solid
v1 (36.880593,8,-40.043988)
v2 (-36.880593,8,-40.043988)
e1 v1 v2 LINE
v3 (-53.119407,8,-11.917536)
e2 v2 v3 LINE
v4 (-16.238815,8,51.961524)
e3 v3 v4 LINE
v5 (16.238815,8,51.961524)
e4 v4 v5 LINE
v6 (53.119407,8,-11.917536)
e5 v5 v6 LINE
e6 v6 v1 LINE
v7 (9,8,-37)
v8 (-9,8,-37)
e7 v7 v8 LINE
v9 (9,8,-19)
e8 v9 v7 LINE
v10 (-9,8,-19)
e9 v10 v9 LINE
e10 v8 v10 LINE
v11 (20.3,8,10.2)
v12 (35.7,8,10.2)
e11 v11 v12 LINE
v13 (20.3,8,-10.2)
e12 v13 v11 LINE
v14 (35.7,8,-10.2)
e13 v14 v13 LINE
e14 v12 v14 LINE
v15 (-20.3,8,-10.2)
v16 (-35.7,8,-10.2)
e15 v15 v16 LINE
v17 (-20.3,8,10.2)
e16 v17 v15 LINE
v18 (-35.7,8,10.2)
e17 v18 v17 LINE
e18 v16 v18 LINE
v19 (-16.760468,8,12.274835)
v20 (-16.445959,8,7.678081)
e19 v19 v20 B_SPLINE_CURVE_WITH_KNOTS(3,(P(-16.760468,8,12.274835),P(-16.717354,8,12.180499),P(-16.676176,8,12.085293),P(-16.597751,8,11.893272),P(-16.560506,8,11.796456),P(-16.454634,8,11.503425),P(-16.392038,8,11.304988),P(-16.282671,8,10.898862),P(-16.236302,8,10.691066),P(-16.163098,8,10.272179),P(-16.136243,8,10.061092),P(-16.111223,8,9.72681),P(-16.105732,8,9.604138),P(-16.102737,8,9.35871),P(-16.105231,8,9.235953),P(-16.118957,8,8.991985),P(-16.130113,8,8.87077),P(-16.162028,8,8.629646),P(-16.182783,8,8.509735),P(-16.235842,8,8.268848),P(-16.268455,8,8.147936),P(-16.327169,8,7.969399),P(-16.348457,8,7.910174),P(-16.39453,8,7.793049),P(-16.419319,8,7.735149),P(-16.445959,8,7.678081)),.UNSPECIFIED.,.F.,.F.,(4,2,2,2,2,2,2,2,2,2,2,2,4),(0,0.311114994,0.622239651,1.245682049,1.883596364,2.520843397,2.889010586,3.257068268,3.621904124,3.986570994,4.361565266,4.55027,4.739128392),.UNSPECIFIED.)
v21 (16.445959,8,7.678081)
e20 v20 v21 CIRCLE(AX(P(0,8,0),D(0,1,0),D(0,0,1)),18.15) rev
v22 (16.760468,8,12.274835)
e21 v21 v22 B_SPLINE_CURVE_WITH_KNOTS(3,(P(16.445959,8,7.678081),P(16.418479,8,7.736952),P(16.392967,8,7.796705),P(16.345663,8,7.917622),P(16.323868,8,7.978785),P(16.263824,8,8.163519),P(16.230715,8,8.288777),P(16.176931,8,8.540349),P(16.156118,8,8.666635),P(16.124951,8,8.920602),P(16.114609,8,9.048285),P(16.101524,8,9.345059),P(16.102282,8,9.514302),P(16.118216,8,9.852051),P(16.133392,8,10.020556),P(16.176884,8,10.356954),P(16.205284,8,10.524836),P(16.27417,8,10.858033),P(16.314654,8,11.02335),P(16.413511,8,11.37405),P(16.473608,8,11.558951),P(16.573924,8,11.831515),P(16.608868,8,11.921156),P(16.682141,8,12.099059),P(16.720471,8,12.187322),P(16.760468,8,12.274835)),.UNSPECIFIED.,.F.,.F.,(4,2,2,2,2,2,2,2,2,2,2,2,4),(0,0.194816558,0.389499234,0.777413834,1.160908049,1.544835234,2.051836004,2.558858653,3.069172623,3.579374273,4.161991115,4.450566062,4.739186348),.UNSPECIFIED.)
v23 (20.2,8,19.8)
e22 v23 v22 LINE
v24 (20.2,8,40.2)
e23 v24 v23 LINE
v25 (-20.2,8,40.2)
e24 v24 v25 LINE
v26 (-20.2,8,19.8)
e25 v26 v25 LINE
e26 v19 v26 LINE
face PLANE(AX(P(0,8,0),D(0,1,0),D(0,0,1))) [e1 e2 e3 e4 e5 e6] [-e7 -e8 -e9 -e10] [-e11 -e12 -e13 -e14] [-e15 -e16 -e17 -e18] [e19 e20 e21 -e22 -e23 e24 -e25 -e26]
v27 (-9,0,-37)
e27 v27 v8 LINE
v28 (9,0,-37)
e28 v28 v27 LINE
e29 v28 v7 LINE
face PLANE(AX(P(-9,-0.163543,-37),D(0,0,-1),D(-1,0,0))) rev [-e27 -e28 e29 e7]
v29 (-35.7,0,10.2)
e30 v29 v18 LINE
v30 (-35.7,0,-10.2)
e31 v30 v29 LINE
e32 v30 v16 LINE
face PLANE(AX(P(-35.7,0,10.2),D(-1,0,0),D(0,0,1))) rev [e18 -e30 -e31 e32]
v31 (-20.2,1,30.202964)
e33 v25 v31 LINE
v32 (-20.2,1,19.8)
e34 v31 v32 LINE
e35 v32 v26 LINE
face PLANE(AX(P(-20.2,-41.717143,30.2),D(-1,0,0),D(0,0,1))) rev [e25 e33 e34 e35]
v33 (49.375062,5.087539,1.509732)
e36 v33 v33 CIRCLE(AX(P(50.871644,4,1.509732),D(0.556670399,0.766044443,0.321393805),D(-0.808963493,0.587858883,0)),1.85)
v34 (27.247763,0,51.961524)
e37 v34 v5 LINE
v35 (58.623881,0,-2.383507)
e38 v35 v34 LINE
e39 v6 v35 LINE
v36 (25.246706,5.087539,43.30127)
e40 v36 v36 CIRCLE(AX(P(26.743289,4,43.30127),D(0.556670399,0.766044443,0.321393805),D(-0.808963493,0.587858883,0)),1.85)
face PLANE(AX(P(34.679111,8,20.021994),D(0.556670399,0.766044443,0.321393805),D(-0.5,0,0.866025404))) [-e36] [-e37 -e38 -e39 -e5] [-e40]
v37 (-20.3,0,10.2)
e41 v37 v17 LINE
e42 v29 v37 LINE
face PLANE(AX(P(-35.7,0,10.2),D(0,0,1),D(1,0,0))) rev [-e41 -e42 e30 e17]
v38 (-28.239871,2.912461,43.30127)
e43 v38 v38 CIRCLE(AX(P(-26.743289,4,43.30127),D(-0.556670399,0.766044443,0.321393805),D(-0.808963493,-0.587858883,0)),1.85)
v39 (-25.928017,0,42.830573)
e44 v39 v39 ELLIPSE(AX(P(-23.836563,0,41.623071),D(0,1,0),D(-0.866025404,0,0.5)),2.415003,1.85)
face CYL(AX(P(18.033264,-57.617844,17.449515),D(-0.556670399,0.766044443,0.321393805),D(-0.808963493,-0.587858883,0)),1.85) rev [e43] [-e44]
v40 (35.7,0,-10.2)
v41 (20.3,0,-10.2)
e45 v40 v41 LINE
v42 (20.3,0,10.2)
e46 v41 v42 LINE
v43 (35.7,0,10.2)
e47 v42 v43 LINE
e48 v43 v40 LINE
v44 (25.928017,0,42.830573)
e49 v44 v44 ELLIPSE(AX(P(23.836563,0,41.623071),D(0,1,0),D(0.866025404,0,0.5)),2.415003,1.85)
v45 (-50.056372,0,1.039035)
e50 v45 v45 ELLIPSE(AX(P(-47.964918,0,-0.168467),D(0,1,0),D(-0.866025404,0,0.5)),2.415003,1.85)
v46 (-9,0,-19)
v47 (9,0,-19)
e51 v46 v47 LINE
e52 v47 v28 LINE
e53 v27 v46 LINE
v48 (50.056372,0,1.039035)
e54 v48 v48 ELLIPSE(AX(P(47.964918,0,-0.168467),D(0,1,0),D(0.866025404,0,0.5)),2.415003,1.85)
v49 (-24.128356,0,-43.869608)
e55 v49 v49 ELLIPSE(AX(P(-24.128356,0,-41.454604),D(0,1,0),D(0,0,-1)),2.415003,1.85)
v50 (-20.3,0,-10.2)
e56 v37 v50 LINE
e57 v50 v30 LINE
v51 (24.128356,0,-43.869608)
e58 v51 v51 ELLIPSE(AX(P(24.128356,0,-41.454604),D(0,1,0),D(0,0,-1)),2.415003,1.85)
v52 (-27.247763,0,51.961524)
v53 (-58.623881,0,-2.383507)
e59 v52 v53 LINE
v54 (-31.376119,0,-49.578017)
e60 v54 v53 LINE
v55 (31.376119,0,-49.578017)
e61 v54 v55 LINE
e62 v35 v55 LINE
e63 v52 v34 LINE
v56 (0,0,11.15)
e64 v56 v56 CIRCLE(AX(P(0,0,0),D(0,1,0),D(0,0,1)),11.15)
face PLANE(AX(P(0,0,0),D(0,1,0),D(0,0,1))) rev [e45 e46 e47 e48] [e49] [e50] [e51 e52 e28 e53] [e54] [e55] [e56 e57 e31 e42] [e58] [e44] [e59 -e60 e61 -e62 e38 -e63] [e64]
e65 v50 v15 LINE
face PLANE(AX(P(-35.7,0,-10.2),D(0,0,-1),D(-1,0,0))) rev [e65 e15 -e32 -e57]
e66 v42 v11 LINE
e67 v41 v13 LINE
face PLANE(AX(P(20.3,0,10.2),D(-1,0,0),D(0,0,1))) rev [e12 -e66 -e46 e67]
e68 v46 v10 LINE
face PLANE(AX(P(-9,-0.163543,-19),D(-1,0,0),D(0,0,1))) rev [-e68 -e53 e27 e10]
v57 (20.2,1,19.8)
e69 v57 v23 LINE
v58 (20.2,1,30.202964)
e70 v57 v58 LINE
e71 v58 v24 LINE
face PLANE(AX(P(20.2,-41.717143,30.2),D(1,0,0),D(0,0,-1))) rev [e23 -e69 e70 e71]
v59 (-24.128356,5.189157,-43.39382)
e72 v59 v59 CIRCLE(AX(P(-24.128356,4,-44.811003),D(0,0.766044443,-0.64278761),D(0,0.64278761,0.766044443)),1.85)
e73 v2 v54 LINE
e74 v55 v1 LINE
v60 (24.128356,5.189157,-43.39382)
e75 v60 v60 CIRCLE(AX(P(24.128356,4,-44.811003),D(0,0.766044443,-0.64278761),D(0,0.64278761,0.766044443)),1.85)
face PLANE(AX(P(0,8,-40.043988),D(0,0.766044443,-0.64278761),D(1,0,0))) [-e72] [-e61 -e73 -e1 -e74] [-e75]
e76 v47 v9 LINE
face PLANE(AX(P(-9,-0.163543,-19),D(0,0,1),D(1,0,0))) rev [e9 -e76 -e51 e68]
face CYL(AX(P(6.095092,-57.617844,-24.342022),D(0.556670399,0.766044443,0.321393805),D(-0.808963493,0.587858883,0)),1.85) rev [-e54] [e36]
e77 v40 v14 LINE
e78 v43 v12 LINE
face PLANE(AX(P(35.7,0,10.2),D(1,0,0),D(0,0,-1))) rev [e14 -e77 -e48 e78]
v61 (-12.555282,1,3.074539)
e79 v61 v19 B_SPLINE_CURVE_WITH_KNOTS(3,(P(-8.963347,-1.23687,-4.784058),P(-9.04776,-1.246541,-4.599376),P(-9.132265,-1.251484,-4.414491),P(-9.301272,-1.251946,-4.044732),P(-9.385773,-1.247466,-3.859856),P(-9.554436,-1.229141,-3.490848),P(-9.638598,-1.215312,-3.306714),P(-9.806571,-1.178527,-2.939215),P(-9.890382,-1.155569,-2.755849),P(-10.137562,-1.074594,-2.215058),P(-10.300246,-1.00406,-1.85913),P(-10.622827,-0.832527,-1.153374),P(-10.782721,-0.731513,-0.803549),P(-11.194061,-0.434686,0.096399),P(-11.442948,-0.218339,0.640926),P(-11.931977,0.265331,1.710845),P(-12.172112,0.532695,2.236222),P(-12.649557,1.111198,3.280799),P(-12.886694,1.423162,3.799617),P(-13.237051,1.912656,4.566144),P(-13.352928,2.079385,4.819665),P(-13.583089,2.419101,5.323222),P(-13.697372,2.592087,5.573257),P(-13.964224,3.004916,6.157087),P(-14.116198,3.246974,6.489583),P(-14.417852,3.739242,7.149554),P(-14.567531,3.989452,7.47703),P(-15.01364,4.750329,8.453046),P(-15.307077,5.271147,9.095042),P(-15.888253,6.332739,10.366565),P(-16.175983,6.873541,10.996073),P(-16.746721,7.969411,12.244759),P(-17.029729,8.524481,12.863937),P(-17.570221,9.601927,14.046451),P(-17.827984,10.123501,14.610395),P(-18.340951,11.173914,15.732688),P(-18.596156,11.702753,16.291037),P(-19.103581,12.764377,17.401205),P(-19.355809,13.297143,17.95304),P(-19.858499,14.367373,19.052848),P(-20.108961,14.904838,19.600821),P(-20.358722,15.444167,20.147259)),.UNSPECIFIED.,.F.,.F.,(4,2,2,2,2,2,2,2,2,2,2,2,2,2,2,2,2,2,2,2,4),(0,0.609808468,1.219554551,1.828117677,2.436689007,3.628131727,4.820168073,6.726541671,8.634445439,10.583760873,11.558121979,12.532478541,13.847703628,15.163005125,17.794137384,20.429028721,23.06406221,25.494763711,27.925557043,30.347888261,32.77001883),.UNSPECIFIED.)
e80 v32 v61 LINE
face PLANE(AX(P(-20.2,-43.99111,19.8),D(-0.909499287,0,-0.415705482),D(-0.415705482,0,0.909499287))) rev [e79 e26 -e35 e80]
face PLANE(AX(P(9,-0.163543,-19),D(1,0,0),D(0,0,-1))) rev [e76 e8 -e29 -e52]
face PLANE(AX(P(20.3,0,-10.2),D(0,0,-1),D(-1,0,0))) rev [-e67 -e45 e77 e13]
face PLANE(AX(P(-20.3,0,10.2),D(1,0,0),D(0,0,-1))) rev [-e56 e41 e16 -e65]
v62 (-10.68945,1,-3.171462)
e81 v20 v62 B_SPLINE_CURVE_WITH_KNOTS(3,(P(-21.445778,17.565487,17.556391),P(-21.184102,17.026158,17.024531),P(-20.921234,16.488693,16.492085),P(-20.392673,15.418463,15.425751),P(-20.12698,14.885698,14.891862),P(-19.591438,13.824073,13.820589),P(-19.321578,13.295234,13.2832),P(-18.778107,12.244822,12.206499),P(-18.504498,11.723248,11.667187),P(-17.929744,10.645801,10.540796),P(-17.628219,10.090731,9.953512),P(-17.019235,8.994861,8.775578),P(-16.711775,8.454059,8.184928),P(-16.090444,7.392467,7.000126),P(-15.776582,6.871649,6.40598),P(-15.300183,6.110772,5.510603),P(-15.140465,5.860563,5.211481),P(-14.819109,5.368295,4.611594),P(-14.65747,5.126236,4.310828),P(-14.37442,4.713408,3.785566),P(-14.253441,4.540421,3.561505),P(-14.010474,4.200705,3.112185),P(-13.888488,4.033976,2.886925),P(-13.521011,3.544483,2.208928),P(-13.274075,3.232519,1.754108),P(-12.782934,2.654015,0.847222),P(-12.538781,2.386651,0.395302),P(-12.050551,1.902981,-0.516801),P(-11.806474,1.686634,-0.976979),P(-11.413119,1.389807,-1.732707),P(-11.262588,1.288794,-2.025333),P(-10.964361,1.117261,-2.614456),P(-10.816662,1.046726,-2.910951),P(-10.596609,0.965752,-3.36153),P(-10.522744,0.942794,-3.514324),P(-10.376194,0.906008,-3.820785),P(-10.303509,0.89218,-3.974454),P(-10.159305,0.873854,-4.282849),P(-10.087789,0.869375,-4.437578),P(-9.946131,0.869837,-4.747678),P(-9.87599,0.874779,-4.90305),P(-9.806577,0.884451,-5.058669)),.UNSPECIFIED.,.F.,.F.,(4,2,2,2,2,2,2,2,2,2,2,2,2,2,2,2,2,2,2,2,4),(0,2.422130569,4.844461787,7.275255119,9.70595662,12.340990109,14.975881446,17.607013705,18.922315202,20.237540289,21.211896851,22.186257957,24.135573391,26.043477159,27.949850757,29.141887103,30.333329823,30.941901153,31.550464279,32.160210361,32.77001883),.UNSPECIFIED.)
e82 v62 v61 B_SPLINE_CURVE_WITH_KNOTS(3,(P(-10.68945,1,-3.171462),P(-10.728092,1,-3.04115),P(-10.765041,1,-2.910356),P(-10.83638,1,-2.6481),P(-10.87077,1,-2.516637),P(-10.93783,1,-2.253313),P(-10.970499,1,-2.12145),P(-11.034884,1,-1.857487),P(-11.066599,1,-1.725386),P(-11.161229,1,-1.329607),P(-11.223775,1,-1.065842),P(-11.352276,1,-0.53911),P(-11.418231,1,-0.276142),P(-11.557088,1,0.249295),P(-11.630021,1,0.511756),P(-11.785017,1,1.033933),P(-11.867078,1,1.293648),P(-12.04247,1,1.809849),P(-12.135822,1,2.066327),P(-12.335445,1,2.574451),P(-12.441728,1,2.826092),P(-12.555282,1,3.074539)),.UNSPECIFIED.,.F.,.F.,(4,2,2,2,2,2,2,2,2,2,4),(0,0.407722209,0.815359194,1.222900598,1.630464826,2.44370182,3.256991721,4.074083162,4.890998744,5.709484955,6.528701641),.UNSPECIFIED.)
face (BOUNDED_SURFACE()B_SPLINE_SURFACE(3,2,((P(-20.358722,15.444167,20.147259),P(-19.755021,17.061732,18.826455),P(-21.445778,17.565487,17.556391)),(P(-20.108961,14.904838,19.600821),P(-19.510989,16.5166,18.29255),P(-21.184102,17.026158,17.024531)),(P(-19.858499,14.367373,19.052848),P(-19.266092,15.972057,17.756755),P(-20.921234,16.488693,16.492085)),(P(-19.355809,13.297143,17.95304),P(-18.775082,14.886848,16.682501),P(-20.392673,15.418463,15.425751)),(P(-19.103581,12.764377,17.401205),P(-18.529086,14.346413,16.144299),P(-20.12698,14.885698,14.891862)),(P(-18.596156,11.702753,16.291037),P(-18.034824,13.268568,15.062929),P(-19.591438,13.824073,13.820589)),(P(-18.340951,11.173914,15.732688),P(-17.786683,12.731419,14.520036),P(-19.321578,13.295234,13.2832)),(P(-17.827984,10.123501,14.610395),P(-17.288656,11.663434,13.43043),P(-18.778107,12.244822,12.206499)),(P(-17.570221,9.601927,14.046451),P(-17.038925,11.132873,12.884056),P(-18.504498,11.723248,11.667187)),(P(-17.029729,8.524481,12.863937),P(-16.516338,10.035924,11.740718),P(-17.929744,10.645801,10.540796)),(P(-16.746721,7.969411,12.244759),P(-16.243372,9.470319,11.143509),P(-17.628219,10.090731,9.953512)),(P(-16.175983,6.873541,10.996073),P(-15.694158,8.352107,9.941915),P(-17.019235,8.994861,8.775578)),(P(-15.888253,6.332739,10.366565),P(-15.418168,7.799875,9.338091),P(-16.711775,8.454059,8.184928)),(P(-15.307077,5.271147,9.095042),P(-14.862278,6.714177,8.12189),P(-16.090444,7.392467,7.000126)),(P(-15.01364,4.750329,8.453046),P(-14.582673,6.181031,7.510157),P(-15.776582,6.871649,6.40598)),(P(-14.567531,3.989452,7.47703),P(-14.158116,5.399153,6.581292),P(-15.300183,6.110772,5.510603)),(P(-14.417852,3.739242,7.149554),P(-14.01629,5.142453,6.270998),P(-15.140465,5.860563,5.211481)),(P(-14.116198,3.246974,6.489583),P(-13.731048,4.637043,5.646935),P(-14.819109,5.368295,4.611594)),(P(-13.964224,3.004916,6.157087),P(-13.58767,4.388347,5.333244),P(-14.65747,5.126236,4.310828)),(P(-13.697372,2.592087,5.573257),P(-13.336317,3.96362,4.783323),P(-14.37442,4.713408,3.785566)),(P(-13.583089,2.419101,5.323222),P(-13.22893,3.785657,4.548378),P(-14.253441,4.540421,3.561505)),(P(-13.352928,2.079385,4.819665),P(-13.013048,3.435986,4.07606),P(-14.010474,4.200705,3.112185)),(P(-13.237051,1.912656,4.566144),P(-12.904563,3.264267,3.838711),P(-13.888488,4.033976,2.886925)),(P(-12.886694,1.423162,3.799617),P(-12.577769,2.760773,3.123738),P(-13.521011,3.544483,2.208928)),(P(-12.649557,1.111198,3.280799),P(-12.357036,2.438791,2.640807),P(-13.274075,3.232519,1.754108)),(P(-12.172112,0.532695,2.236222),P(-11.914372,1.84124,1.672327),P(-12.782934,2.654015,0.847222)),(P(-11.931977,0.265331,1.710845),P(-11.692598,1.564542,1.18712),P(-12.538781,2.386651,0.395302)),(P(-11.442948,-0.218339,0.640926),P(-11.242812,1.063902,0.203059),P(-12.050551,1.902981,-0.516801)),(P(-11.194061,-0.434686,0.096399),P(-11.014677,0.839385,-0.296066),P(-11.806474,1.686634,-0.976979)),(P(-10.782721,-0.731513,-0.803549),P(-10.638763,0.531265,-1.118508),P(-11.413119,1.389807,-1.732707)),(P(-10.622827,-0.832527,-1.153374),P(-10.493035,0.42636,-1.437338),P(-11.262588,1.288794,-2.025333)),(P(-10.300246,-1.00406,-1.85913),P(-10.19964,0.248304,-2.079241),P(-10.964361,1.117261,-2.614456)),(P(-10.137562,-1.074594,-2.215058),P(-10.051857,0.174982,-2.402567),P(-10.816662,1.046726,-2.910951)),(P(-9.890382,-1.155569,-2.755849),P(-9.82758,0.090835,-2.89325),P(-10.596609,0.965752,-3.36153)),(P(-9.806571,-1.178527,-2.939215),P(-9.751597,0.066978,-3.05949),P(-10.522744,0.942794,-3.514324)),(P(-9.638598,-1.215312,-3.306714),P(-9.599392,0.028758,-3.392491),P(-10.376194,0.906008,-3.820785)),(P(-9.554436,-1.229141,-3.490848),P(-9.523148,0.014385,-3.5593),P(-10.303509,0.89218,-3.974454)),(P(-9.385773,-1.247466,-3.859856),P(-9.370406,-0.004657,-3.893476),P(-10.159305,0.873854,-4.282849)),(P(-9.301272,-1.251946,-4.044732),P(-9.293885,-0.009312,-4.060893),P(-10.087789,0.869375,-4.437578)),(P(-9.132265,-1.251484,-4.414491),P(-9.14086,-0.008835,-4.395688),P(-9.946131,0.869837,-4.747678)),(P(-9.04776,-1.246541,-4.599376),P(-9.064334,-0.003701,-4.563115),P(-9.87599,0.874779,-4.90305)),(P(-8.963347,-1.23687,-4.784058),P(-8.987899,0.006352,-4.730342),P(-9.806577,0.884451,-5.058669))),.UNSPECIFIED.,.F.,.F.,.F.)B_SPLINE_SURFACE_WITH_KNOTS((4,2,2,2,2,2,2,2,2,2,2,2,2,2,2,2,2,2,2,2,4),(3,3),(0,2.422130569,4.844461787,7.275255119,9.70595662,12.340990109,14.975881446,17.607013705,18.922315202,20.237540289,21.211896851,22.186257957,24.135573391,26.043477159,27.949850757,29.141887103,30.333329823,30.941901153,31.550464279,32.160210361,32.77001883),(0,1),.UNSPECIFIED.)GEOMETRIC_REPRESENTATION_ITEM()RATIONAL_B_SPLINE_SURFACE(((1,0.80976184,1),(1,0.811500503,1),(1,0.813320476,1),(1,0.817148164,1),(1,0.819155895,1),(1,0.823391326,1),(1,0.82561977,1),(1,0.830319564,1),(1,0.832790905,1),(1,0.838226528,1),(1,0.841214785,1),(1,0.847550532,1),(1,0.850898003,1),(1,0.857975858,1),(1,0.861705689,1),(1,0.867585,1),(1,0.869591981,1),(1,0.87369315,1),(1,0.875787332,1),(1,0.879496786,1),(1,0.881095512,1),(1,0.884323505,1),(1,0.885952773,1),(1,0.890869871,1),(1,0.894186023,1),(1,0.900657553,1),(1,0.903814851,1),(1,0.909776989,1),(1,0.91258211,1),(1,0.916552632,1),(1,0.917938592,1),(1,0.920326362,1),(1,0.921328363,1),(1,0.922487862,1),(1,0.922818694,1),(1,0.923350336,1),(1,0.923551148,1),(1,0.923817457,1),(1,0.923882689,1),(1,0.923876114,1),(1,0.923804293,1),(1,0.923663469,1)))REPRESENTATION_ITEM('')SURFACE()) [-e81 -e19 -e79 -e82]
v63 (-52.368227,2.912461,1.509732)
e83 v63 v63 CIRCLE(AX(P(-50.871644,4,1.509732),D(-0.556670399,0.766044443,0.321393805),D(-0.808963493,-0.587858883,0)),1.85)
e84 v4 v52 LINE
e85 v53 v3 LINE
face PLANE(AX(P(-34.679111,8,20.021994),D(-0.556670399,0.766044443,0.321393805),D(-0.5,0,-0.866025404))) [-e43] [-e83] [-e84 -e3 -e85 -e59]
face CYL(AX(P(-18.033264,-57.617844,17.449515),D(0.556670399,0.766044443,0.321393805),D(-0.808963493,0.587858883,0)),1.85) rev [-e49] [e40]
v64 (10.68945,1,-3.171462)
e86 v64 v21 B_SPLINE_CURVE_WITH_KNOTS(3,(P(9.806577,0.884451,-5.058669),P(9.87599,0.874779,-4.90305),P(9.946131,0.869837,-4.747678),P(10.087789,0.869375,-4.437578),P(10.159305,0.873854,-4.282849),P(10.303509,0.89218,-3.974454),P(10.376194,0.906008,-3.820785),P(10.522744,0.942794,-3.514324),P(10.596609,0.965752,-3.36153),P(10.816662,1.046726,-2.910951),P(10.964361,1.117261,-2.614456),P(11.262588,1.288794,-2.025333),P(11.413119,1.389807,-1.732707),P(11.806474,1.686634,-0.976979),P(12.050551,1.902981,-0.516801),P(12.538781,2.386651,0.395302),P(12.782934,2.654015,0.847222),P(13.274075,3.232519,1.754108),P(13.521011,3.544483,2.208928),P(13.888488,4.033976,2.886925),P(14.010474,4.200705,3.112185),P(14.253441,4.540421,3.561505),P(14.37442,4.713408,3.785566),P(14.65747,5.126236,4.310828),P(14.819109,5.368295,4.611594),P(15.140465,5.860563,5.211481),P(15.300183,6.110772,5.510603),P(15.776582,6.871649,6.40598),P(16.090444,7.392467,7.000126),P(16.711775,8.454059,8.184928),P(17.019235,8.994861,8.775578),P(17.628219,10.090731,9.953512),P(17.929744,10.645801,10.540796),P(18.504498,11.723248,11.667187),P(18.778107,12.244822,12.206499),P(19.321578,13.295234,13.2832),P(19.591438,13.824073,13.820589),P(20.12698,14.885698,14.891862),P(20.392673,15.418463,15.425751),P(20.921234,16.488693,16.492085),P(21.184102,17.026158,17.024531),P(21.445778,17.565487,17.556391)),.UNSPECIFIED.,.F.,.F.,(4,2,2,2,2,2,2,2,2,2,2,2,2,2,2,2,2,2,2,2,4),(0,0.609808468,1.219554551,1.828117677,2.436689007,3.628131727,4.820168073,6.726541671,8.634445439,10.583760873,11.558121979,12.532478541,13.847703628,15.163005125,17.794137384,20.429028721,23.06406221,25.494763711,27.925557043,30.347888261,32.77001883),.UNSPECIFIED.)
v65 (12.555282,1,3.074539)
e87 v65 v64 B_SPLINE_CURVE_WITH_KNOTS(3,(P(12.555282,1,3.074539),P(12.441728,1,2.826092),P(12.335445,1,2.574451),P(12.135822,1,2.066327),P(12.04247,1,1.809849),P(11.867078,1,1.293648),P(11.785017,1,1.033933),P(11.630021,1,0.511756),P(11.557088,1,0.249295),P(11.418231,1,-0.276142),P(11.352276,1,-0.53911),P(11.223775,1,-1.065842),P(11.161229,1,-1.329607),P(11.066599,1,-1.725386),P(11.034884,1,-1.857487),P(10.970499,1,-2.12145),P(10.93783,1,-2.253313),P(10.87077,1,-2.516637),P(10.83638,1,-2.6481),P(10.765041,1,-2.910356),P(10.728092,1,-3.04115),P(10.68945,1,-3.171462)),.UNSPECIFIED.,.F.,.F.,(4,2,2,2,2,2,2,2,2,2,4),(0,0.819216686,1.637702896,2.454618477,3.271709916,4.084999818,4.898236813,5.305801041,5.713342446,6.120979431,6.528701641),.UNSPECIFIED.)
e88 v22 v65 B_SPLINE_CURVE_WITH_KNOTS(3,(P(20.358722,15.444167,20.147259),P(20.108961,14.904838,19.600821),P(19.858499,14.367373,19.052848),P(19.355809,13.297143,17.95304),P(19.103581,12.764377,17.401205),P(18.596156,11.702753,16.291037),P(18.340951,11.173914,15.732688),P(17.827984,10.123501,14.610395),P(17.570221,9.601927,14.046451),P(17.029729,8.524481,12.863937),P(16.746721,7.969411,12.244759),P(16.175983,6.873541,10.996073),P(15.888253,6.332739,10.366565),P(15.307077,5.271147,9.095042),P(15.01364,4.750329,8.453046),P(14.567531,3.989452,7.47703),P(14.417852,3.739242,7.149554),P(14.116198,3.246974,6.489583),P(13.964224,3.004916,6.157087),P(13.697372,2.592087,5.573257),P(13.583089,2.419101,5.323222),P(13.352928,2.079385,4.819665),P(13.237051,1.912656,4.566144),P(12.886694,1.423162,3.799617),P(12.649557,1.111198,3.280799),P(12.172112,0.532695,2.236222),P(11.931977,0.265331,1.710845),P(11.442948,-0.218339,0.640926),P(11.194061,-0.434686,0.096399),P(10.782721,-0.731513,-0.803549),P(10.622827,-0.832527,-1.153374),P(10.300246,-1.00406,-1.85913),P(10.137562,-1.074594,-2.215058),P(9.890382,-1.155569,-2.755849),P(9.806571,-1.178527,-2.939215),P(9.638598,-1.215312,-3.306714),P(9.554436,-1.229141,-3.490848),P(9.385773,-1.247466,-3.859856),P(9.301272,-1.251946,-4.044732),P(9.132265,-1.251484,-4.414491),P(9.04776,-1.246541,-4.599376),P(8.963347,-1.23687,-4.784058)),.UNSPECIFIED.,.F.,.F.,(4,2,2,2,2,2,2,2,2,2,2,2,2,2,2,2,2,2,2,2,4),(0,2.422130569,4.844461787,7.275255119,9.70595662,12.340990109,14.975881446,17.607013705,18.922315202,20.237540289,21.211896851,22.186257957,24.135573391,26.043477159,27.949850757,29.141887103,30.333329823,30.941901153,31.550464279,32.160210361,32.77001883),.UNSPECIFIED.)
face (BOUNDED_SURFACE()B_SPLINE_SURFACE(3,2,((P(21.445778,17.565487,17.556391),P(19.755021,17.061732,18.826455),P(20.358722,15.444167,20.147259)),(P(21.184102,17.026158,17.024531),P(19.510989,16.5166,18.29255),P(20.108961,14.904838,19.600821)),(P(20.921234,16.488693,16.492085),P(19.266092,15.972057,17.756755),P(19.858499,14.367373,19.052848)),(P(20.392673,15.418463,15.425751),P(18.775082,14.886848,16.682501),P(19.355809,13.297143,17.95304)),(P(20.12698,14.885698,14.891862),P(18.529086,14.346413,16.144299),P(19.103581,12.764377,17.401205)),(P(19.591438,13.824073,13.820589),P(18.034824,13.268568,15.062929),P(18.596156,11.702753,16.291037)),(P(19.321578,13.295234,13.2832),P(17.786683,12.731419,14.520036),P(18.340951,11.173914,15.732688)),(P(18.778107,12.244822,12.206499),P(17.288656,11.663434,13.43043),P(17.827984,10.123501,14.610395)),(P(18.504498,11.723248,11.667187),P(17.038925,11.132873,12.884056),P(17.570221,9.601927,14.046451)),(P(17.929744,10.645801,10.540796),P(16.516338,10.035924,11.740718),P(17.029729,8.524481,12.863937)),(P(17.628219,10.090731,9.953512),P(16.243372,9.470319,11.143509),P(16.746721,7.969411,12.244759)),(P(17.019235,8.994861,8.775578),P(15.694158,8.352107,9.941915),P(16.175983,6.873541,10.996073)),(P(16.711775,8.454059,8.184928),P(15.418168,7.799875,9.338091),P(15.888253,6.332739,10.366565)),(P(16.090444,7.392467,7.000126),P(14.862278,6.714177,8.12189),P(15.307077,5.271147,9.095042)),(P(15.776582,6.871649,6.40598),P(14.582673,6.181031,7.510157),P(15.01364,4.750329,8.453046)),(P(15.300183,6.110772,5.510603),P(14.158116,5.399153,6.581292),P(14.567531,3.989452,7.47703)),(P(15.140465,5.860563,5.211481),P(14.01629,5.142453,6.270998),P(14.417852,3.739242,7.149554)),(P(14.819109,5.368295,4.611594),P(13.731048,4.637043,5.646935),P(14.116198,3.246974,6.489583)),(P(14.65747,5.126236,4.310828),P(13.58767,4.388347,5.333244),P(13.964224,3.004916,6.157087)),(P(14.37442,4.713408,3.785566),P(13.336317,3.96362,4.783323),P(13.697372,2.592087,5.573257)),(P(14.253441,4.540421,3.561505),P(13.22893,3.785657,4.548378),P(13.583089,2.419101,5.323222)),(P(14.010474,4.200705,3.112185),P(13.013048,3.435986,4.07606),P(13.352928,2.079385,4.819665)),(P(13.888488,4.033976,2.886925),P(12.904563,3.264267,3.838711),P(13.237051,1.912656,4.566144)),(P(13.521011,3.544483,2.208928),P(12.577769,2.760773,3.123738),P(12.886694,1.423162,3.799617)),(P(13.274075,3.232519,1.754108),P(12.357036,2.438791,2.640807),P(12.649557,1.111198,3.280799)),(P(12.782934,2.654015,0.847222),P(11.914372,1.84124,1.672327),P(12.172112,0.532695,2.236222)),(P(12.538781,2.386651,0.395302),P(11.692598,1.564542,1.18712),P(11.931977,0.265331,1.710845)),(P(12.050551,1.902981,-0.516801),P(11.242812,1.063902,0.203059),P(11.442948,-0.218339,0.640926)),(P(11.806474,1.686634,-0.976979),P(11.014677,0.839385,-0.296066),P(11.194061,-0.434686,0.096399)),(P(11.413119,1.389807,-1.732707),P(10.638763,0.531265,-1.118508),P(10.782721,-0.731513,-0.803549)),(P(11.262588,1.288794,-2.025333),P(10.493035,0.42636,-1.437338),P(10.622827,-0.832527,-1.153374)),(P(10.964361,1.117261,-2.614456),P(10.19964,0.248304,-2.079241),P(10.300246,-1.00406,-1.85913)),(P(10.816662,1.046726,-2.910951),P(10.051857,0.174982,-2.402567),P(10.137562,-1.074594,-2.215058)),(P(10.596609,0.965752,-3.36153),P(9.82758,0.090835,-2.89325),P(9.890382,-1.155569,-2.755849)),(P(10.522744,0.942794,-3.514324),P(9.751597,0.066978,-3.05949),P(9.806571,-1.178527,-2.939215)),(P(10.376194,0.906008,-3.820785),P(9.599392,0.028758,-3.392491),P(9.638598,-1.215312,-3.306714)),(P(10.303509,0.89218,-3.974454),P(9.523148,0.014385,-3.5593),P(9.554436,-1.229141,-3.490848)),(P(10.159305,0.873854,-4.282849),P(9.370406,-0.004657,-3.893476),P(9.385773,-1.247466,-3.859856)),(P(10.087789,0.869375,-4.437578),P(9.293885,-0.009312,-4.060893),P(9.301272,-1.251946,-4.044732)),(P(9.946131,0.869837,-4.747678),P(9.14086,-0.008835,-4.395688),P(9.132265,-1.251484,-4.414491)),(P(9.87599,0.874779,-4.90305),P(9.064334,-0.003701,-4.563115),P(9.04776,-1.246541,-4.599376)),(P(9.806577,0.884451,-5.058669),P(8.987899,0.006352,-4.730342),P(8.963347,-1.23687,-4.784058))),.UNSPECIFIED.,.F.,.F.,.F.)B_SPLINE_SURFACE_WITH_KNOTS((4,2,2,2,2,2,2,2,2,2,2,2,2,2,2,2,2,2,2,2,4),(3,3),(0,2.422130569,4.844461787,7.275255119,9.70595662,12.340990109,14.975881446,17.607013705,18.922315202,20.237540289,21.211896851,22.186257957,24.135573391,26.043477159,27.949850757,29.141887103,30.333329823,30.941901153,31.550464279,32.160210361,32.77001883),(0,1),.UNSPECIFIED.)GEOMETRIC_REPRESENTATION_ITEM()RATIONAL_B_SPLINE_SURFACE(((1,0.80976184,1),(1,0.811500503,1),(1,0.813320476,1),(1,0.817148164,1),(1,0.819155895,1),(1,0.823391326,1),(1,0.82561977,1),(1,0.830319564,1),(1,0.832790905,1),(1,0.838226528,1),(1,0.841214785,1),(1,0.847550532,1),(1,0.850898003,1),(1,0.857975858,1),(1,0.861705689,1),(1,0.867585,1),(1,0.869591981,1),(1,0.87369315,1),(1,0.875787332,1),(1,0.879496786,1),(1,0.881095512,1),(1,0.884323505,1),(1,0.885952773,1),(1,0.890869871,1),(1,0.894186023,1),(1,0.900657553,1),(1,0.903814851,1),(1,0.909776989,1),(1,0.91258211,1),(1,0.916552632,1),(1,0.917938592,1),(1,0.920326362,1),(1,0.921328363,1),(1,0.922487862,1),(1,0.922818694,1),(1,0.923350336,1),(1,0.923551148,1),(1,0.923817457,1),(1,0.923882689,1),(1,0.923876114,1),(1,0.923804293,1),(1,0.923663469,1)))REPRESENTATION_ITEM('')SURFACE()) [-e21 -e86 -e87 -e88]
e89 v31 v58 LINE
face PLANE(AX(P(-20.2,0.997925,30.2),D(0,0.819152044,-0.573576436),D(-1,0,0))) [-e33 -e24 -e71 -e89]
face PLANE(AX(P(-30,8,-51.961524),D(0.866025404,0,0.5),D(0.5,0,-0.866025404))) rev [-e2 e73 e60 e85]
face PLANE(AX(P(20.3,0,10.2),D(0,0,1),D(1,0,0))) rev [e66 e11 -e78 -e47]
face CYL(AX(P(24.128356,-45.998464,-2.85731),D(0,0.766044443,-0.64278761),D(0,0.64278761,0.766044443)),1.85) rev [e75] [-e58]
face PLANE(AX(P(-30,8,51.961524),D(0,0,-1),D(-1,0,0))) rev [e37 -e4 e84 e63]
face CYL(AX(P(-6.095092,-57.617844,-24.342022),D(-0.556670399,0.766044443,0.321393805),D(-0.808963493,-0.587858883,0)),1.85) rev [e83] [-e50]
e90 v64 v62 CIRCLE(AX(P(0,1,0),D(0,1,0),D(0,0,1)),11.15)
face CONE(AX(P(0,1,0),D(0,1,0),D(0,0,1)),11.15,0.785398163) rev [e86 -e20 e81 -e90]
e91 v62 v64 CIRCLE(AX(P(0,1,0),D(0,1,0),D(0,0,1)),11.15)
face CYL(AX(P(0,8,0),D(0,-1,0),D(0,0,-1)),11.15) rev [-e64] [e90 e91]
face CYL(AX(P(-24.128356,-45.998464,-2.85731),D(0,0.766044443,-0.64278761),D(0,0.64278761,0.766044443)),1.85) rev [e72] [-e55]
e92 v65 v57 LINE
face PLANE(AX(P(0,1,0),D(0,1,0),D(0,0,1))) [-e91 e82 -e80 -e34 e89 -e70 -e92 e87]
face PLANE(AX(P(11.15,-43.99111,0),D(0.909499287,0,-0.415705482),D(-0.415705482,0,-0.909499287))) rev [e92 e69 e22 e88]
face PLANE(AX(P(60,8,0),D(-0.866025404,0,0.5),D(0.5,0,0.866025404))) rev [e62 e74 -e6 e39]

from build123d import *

# Parameters (mm, degrees)
BOSS_EXTRUDE1_DEPTH = 8
CHAMFER1_SIZE       = 10
CHAMFER1_SIZE_2     = 11.917535926
SKETCH4_R           = 1.85
CUT_EXTRUDE1_DEPTH  = 101.029376687
SKETCH5_R           = 11.15
CUT_EXTRUDE3_DEPTH  = 79.744901298
SKETCH6_R           = 1.85
CUT_EXTRUDE4_DEPTH  = 101.029376687
SKETCH7_R           = 1.85
CUT_EXTRUDE5_DEPTH  = 97.338690096
SKETCH8_W           = 15.4
SKETCH8_H           = 20.4
CUT_EXTRUDE6_DEPTH  = 79.744901298
SKETCH9_W           = 40.4
SKETCH9_H           = 10.4
CUT_EXTRUDE7_DEPTH  = 7
CUT_EXTRUDE8_DEPTH  = 7
CHAMFER2_SIZE       = 7
CHAMFER3_SIZE       = 10
CHAMFER3_SIZE_2     = 7.002075382
FILLET1_R           = 3
SKETCH11_W          = 18
SKETCH11_H          = 18
CUT_EXTRUDE9_DEPTH  = 79.744901364


with BuildPart() as part:
    # Sketch1 → Boss-Extrude1 (new body)
    with BuildSketch(Plane(origin=(0, 0, 0), x_dir=(1, 0, 0), z_dir=(0, 1, 0))):
        Polygon((-60, 0), (-30, -51.961524227), (30, -51.961524227), (60, 0), (30, 51.961524227), (-30, 51.961524227), align=None)
    extrude(amount=BOSS_EXTRUDE1_DEPTH)

    # Chamfer1
    # the kernel refuses this chamfer: 11.917535926, 10 mm, written as the material it takes off along each edge
    with BuildSketch(Plane(origin=(60.716329832, 8, -51.961524227), x_dir=(0, -0.9993728857116146, -0.0354095369136628), z_dir=(-1, 0, 0)), Plane(origin=(-75.358164916, 8, -26.601121946), x_dir=(-0.030665558503474466, -0.9993728857116146, 0.017704768456831187), z_dir=(0.4999999999999998, 0, 0.8660254037844388)), Plane(origin=(14.641835084, 8, 78.562646173), x_dir=(0.03066555850347504, -0.9993728857116146, 0.017704768456831523), z_dir=(0.4999999999999999, 0, -0.8660254037844388))) as chamfer1_piece_1:
        Polygon((CHAMFER1_SIZE * 0.999372885712, CHAMFER1_SIZE * 0.0354095369137), (-CHAMFER1_SIZE_2 * 0.0354095369135, CHAMFER1_SIZE_2 * 0.999372885707), (0, 0), align=None)
    extrude(amount=121.432659665, mode=Mode.SUBTRACT)

    # Sketch4 → Cut-Extrude1 (cut, through all)
    with BuildSketch(Plane(origin=(17.740047471, 24.412407781, 10.242221183), x_dir=(0.8301060005968394, -0.4979011414928883, -0.251034820439713), z_dir=(0.5566703992264198, 0.7660444431189777, 0.3213938048432698))):
        with Locations(Location((39.858257334, -1.394557769, 0), (0, 0, 164.627134315))):
            Circle(SKETCH4_R)
        with Locations(Location((9.338033447, -38.774045448, 0), (0, 0, 164.627134315))):
            Circle(SKETCH4_R)
    extrude(amount=-CUT_EXTRUDE1_DEPTH, mode=Mode.SUBTRACT)

    # Sketch5 → Cut-Extrude3 (cut, through all)
    with BuildSketch(Plane(origin=(0, 0, 0), x_dir=(1, 0, 0), z_dir=(0, 1, 0))):
        with Locations(Location((0, 0, 0), (0, 0, 270))):
            Circle(SKETCH5_R)
    extrude(amount=CUT_EXTRUDE3_DEPTH, mode=Mode.SUBTRACT)

    # Sketch6 → Cut-Extrude4 (cut, through all)
    with BuildSketch(Plane(origin=(-17.740047471, 24.412407781, 10.242221183), x_dir=(0.8307334510088673, 0.5133226132381532, 0.21536440772154375), z_dir=(-0.5566703992264165, 0.7660444431189809, 0.3213938048432678))):
        with Locations(Location((-39.882343662, 0.155348314, 0), (0, 0, 193.145847187))):
            Circle(SKETCH6_R)
        with Locations(Location((-10.837701827, -38.381892712, 0), (0, 0, 193.145847187))):
            Circle(SKETCH6_R)
    extrude(amount=-CUT_EXTRUDE4_DEPTH, mode=Mode.SUBTRACT)

    # Sketch7 → Cut-Extrude5 (cut, through all)
    with BuildSketch(Plane(origin=(0, 24.412407781, -20.484442365), x_dir=(1, 0, 0), z_dir=(0, 0.7660444431189811, -0.6427876096865357))):
        with Locations(Location((-24.128355545, 31.756069148, 0), (0, 0, 270))):
            Circle(SKETCH7_R)
        with Locations(Location((24.128355545, 31.756069148, 0), (0, 0, 270))):
            Circle(SKETCH7_R)
    extrude(amount=-CUT_EXTRUDE5_DEPTH, mode=Mode.SUBTRACT)

    # Sketch8 → Cut-Extrude6 (cut, through all)
    with BuildSketch(Plane(origin=(0, 8, 0), x_dir=(1, 0, 0), z_dir=(0, 1, 0))):
        with Locations((-28, 0)):
            Rectangle(SKETCH8_W, SKETCH8_H)
        with Locations((28, 0)):
            Rectangle(SKETCH8_W, SKETCH8_H)
    extrude(amount=-CUT_EXTRUDE6_DEPTH, mode=Mode.SUBTRACT)

    # Sketch9 → Cut-Extrude7 (cut)
    with BuildSketch(Plane(origin=(0, 8, 0), x_dir=(1, 0, 0), z_dir=(0, 1, 0))):
        with Locations((0, -25)):
            Rectangle(SKETCH9_W, SKETCH9_H)
    extrude(amount=-CUT_EXTRUDE7_DEPTH, mode=Mode.SUBTRACT)

    # Sketch10 → Cut-Extrude8 (cut)
    with BuildSketch(Plane(origin=(0, 8, 0), x_dir=(1, 0, 0), z_dir=(0, 1, 0))):
        Polygon((-20.2, -19.8), (-11.15, 0), (11.15, 0), (20.2, -19.8), align=None)
    extrude(amount=-CUT_EXTRUDE8_DEPTH, mode=Mode.SUBTRACT)

    # Chamfer2
    chamfer2_edges = [part.edges().sort_by_distance(p)[0] for p in [
        (0, 8, -11.15),
    ]]
    chamfer(chamfer2_edges, length=CHAMFER2_SIZE)

    # Chamfer3
    # the kernel refuses this chamfer: 10, 7.002075382 mm, written as the material it takes off along each edge
    with BuildSketch(Plane(origin=(20.2, 8, 30.2), x_dir=(0, 0.02220967419845712, 0.9997533347641299), z_dir=(-1, 0, 0))) as chamfer3_piece_1_section:
        Polygon((CHAMFER3_SIZE * 0.999753334764, -CHAMFER3_SIZE * 0.0222096741985), (-CHAMFER3_SIZE_2 * 0.0222096741988, -CHAMFER3_SIZE_2 * 0.999753334778), (0, 0), align=None)
    chamfer3_piece_1 = extrude(amount=40.4, mode=Mode.PRIVATE)
    chamfer3_piece_1 = split(chamfer3_piece_1, bisect_by=Plane(origin=(0, 1, 33.539189969), z_dir=(0, 1, 0)), keep=Keep.TOP, mode=Mode.PRIVATE)
    add(chamfer3_piece_1, mode=Mode.SUBTRACT)

    # Fillet1
    fillet1_edges = [part.edges().sort_by_distance(p)[0] for p in [
        (-13.4116744, 4.145370972, 4.948193714),
        (13.4116744, 4.145370972, 4.948193714),
    ]]
    fillet(fillet1_edges, radius=FILLET1_R)

    # Sketch11 → Cut-Extrude9 (cut, through all)
    with BuildSketch(Plane(origin=(0, 8, 0), x_dir=(1, 0, 0), z_dir=(0, 1, 0))):
        with Locations((0, 28)):
            Rectangle(SKETCH11_W, SKETCH11_H)
    extrude(amount=-CUT_EXTRUDE9_DEPTH, mode=Mode.SUBTRACT)


solid = part.part
